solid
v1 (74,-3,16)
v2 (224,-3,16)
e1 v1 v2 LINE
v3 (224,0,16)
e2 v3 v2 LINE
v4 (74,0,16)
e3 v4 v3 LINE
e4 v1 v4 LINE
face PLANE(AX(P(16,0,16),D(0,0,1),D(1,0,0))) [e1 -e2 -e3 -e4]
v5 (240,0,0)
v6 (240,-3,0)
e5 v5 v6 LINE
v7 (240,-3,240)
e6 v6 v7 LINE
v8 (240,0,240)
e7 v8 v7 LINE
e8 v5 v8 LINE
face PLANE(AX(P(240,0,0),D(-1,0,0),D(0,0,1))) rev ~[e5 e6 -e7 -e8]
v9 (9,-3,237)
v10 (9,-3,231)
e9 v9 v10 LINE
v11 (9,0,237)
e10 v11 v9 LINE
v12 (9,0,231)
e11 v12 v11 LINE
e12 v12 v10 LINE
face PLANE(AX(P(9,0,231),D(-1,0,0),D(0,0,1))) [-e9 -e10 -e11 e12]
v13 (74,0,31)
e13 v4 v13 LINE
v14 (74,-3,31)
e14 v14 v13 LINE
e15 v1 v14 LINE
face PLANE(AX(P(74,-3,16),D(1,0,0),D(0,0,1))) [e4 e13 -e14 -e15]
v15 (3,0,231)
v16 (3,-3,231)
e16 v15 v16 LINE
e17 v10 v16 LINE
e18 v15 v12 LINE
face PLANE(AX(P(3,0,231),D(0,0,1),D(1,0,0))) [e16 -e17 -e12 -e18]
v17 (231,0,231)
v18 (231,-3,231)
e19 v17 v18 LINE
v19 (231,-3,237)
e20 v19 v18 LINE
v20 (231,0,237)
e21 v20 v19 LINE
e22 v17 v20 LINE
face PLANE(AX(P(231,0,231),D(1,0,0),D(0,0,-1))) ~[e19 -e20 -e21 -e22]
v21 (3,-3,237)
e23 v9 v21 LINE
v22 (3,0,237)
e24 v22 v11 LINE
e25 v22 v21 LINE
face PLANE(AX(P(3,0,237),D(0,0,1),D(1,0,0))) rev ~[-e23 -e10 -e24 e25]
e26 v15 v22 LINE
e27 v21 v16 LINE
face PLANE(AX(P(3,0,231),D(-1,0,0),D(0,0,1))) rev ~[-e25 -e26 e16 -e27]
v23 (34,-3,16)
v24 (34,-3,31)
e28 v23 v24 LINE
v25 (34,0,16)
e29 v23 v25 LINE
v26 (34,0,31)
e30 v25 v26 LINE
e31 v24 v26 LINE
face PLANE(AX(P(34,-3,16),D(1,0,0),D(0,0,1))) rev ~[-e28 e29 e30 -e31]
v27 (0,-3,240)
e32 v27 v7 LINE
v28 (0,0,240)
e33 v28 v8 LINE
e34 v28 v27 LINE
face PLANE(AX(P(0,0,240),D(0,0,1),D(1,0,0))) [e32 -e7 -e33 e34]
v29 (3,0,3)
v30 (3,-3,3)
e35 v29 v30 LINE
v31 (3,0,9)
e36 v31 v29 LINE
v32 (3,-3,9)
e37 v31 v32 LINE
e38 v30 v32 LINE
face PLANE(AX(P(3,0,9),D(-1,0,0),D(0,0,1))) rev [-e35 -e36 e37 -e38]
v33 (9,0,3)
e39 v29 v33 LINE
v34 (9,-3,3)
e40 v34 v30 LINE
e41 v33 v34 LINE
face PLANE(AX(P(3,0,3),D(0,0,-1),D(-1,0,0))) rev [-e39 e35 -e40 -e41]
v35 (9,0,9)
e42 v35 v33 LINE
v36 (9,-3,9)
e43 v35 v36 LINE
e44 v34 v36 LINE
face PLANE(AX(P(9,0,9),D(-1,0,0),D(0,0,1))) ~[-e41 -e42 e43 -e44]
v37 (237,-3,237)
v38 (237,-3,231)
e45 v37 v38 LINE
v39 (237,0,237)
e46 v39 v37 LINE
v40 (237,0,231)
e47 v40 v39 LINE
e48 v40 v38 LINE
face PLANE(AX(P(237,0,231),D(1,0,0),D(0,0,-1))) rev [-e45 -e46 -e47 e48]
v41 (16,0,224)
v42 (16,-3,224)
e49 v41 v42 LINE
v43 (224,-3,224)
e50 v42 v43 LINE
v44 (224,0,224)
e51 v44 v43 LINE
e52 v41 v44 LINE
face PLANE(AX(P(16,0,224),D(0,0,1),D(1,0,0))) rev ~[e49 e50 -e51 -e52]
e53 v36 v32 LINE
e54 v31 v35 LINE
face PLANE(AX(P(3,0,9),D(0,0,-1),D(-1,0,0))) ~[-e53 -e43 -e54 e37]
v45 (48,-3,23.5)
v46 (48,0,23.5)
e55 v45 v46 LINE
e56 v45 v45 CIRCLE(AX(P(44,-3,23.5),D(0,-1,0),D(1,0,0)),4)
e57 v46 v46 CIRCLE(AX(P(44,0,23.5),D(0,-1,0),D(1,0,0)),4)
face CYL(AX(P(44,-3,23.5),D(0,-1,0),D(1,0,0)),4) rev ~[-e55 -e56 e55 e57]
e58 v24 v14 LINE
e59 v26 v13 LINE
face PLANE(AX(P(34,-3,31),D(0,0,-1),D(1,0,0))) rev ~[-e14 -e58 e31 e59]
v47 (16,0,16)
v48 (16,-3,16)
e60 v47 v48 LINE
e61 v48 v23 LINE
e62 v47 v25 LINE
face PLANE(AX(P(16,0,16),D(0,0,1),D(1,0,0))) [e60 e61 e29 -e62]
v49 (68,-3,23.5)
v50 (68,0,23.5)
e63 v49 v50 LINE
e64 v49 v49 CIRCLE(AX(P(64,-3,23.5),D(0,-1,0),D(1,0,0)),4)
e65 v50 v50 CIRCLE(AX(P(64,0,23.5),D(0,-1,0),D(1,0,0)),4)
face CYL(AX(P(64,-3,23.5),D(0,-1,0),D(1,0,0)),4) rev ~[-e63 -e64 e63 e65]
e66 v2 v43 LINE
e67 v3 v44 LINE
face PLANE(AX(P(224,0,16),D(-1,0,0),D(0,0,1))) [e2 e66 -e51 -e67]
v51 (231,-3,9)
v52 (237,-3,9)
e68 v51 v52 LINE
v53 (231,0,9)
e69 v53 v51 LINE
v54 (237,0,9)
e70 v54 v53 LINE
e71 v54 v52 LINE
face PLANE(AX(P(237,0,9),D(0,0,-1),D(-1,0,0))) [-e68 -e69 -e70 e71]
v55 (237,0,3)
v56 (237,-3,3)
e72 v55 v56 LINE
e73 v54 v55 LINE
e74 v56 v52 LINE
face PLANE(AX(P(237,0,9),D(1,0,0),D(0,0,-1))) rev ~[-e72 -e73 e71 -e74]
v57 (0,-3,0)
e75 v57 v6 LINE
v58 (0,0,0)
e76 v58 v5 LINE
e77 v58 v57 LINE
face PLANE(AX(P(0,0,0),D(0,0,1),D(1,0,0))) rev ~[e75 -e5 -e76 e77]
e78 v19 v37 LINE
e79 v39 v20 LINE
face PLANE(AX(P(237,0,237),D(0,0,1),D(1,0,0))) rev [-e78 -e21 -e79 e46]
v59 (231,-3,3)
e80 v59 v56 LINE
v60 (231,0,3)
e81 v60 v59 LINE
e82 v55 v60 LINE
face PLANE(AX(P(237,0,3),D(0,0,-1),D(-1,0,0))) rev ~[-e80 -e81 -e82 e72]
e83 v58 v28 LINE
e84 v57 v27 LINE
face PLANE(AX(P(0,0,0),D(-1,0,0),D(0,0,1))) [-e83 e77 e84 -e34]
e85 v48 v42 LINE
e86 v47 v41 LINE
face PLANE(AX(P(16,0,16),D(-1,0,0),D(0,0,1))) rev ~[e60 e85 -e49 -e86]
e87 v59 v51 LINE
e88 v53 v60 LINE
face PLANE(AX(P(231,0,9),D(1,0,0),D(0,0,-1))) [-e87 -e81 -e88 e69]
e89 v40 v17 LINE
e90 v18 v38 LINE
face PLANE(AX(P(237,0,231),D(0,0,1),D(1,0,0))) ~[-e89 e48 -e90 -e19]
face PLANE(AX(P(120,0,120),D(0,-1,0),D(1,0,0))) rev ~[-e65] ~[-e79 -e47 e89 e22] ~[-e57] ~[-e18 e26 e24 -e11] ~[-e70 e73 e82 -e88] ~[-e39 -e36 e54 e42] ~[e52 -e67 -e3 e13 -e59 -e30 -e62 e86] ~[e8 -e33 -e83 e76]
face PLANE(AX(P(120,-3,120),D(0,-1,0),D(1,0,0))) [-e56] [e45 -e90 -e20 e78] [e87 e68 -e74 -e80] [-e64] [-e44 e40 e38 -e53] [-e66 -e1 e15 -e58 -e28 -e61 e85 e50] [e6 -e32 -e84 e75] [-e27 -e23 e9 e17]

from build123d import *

# Parameters (mm, degrees)
F1_W     = 240
F1_H     = 240
F1_W_2   = 6
F1_H_2   = 6
F1_W_3   = 208
F1_H_3   = 208
F2_DEPTH = 3
F3_DEPTH = 25
F8_W     = 40
F8_H     = 15
F8_R     = 4
F9_DEPTH = 3


with BuildPart() as f2:
    # F1 (on Front) → F2 (new body)
    with BuildSketch(Plane.XZ):
        with Locations((120, 120)):
            Rectangle(F1_W, F1_H)
        with Locations((6, 234)):
            Rectangle(F1_W_2, F1_H_2, mode=Mode.SUBTRACT)
        with Locations((120, 120)):
            Rectangle(F1_W_3, F1_H_3, mode=Mode.SUBTRACT)
        with Locations((6, 234)):
            Rectangle(F1_W_2, F1_H_2)
    extrude(amount=F2_DEPTH)

    # F1 (on Front) → F3 (cut)
    with BuildSketch(Plane.XZ):
        with Locations((6, 234)):
            Rectangle(F1_W_2, F1_H_2)
    extrude(amount=F3_DEPTH, mode=Mode.SUBTRACT)

    # F5: F2 across plane


with BuildPart() as f2_1:
    add(f2.part)
    add(f2.part.mirror(Plane(origin=(120, -1.5, 120), x_dir=(0, -1, 0), z_dir=(-1, 0, 0))), mode=Mode.INTERSECT)

    # F7: F2 across plane


with BuildPart() as f2_2:
    add(f2_1.part)
    add(f2_1.part.mirror(Plane(origin=(120, -1.5, 120), x_dir=(1, 0, 0), z_dir=(0, 0, 1))), mode=Mode.INTERSECT)

    # F8 (on face) → F9 (join)
    with BuildSketch(Plane.XZ.offset(3)):
        with Locations((54, 23.5)):
            Rectangle(F8_W, F8_H)
        with Locations((44, 23.5)):
            Circle(F8_R, mode=Mode.SUBTRACT)
        with Locations((64, 23.5)):
            Circle(F8_R, mode=Mode.SUBTRACT)
    extrude(amount=-F9_DEPTH)


solid = f2_2.part
